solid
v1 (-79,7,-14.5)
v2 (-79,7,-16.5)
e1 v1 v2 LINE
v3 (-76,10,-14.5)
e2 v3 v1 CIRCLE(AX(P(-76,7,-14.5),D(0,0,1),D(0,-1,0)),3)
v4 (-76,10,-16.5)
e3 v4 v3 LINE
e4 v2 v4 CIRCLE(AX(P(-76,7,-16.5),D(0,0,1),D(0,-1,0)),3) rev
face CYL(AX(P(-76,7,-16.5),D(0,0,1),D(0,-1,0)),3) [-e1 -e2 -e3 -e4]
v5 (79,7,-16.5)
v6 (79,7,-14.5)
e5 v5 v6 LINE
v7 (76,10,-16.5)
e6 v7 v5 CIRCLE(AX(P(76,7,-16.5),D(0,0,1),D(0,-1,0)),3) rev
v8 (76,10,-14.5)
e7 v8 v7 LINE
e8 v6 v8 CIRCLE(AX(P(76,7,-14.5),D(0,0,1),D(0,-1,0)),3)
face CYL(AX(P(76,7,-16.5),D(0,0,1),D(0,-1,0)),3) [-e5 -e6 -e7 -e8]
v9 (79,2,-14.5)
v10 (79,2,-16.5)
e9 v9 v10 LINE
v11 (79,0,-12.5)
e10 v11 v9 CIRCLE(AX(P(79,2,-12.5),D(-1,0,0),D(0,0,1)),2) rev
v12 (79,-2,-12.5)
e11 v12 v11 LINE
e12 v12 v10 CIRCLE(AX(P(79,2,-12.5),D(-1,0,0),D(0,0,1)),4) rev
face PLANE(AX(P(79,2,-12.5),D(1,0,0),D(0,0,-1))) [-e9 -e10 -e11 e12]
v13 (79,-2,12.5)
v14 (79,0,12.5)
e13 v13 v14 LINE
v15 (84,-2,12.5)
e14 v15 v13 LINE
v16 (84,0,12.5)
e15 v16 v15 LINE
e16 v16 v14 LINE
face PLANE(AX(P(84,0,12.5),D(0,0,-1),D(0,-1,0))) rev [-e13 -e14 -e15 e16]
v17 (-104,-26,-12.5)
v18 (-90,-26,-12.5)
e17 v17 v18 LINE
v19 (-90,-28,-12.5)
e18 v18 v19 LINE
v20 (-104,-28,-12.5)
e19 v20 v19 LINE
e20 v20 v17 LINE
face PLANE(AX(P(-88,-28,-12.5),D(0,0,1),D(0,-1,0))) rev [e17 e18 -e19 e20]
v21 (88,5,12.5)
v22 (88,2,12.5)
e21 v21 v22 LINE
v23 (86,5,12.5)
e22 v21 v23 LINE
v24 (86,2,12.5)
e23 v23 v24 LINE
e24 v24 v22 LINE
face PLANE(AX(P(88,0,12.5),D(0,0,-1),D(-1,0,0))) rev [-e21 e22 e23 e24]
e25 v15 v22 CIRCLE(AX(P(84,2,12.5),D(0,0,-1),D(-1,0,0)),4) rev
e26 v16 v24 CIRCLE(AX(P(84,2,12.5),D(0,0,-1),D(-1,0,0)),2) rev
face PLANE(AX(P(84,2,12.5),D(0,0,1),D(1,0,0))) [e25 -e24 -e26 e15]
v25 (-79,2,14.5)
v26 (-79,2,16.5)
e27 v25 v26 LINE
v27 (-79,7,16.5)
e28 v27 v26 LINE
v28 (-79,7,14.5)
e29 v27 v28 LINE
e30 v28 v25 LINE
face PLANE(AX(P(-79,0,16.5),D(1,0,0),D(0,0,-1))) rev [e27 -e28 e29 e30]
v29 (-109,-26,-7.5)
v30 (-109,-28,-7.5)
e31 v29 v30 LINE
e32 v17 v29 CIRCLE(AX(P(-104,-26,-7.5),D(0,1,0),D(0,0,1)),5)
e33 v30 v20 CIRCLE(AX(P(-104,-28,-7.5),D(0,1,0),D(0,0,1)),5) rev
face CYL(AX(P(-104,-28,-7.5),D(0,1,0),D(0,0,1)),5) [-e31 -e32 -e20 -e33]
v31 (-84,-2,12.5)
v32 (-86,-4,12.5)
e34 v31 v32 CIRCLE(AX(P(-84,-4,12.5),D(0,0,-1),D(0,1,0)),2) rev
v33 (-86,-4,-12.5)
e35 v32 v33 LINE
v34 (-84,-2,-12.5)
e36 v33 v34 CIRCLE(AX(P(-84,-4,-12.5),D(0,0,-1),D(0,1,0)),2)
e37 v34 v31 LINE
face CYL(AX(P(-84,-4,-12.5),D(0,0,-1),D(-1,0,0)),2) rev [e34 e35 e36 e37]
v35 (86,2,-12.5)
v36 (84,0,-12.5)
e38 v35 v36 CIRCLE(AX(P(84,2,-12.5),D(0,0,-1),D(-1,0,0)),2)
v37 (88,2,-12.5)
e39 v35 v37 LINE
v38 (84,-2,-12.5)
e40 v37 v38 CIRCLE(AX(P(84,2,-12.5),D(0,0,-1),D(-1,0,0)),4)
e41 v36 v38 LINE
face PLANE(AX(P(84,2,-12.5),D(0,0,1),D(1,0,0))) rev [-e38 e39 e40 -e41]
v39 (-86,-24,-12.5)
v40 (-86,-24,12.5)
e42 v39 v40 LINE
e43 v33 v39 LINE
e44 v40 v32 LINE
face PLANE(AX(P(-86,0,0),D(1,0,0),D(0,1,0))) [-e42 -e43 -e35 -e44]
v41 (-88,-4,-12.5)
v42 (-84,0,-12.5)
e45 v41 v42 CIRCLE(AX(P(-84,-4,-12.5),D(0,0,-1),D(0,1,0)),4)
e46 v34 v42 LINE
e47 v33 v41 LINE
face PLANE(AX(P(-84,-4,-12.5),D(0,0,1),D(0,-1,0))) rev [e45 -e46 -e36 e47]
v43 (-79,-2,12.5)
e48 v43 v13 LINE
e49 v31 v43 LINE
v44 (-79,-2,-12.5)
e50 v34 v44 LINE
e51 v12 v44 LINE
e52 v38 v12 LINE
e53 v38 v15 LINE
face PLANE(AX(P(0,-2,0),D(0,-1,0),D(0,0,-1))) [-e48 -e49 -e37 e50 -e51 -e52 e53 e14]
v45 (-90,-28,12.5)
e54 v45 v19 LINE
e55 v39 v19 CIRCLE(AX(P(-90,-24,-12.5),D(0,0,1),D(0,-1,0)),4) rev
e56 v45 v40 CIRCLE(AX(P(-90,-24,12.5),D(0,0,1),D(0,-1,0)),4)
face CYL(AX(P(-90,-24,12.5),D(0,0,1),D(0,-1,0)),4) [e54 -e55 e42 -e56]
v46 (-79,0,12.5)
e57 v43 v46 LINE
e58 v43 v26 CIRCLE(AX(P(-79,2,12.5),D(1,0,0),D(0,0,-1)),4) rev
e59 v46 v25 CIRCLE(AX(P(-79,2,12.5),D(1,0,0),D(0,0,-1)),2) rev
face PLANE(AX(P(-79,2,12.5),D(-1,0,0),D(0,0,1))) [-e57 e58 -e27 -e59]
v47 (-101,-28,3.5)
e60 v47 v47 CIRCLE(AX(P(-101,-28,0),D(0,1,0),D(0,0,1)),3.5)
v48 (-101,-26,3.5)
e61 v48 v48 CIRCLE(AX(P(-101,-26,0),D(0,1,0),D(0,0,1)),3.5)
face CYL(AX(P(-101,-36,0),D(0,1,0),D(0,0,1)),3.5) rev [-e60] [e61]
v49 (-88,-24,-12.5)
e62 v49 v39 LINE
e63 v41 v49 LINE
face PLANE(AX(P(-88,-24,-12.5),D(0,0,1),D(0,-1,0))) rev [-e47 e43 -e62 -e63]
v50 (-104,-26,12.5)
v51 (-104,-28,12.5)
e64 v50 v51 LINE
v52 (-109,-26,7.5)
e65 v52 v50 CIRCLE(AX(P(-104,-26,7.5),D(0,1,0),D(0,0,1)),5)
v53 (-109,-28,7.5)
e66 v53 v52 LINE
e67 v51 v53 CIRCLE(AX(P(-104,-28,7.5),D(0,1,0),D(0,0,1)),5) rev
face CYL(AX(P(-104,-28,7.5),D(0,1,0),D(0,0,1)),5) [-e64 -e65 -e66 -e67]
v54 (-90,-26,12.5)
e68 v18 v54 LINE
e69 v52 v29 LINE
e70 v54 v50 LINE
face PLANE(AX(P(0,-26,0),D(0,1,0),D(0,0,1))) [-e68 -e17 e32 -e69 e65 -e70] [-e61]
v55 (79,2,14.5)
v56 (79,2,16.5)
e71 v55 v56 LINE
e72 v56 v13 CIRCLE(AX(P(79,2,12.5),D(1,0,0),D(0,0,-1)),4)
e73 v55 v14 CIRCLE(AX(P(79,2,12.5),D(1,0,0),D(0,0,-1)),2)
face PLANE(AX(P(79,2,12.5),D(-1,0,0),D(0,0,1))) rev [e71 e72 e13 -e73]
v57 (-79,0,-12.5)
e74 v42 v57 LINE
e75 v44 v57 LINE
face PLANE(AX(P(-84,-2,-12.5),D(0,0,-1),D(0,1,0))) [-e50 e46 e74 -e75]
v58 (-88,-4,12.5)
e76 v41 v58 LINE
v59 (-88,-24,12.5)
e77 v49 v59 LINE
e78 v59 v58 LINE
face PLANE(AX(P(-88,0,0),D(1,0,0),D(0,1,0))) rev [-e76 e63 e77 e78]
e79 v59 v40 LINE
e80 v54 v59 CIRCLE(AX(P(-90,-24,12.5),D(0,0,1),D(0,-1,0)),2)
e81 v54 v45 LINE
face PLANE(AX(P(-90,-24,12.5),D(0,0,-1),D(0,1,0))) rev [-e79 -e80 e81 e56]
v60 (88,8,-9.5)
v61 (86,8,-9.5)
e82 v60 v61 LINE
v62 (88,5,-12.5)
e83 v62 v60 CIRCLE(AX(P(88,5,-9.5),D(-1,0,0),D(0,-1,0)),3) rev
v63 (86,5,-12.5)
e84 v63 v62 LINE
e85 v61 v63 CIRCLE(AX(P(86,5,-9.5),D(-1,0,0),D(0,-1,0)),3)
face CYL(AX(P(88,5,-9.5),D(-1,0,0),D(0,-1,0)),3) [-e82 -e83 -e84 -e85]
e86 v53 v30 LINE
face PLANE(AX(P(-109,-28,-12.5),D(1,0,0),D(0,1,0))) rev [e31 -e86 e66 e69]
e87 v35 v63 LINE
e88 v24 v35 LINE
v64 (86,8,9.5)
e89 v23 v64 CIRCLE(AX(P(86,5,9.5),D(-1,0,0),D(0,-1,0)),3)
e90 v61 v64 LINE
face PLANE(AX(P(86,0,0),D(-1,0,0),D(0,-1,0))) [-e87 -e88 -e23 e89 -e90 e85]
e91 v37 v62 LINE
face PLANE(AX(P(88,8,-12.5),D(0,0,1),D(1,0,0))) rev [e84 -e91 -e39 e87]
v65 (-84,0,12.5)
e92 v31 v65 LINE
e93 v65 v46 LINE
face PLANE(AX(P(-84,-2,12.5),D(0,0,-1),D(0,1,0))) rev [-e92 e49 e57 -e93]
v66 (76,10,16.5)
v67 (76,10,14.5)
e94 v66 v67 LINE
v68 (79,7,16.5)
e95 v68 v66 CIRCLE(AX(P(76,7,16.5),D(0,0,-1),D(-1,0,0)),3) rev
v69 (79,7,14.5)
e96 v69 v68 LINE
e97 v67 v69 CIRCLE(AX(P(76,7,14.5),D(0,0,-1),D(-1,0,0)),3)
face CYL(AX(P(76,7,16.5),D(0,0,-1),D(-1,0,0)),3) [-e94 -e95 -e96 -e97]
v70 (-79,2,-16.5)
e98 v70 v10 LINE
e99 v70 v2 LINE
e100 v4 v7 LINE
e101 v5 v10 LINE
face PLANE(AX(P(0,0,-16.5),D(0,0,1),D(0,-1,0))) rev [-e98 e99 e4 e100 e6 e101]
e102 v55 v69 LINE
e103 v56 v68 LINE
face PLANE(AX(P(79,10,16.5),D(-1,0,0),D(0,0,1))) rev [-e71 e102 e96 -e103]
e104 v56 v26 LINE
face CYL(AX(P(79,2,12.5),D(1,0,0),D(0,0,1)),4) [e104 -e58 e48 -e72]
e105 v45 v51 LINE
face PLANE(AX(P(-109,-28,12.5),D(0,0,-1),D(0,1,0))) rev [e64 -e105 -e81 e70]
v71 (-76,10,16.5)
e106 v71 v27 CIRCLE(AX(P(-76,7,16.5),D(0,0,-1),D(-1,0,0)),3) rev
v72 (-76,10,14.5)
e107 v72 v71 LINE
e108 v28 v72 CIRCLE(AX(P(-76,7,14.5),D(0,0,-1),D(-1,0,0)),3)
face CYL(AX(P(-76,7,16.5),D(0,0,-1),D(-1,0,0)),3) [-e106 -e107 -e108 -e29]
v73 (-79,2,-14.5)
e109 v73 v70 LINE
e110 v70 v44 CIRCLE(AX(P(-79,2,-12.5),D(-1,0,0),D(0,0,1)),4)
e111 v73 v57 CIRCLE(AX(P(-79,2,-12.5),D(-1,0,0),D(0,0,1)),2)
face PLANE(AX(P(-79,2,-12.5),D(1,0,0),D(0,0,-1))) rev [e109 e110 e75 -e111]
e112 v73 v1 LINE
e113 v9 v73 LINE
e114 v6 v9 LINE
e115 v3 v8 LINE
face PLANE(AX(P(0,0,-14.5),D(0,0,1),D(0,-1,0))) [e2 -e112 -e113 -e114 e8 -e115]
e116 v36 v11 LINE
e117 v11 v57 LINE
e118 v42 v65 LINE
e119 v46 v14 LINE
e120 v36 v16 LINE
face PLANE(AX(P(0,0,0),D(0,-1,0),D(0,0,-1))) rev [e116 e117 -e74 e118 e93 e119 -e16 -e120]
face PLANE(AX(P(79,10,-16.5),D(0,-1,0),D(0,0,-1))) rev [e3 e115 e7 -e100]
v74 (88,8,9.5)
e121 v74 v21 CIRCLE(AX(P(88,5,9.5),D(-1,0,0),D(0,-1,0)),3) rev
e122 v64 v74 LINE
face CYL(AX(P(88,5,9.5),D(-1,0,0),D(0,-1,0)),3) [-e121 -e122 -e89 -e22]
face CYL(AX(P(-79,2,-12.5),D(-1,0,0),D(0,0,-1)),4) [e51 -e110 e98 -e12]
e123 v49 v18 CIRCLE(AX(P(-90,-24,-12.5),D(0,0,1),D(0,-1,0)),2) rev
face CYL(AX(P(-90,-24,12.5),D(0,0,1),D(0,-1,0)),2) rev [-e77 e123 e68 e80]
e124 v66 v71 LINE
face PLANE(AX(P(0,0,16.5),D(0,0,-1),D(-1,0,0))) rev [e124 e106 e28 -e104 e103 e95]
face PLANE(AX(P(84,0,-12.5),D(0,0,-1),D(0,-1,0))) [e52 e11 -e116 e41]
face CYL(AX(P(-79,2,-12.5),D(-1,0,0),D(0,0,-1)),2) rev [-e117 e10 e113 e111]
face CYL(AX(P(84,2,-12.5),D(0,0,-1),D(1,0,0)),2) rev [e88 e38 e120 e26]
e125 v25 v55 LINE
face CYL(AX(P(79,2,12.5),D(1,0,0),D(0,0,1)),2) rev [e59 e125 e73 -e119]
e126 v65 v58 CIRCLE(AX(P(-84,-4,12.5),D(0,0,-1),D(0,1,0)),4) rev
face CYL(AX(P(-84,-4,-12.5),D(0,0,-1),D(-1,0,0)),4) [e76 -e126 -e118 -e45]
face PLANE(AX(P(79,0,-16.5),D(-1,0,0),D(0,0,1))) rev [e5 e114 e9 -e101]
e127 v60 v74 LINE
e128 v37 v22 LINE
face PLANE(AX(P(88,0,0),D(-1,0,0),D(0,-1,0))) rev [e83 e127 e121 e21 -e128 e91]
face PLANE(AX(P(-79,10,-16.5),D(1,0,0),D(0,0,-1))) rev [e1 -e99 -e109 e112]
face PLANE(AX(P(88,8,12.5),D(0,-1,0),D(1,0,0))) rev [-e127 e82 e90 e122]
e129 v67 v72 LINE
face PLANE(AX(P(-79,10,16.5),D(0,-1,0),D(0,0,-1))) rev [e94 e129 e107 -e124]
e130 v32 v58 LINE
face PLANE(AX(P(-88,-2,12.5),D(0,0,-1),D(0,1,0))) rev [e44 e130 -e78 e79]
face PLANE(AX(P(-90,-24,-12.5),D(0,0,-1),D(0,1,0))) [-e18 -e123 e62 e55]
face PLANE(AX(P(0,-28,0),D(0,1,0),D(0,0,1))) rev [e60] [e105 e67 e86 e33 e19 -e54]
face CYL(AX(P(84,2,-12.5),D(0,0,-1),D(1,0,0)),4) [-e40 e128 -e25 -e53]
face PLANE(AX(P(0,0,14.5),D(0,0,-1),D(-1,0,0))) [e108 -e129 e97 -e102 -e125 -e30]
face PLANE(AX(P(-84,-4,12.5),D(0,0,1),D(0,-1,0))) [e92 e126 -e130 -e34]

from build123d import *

# Parameters (mm, degrees)
SKETCH_1_W                  = 158
SKETCH_1_H                  = 25
SM_BASE_FLANGE_1_DEPTH      = 2
SM_EDGE_FLANGE_1_DEPTH      = 158
SM_EDGE_FLANGE_1_BEND_DEPTH = 158
SM_EDGE_FLANGE_2_DEPTH      = 25
SM_EDGE_FLANGE_3_DEPTH      = 25
SM_EDGE_FLANGE_4_DEPTH      = 25
FILLET_1_R                  = 3
SKETCH_21_R                 = 3.5
CUT_EXTRUDE_1_DEPTH         = 10
FILLET_2_R                  = 5


# Sheet-metal steps are written as plain solids
with BuildPart() as part:
    # Sketch 1 → Базовая кромка1 (new body)
    with BuildSketch(Plane(origin=(0, 0, 0), x_dir=(1, 0, 0), z_dir=(0, 1, 0))):
        Rectangle(SKETCH_1_W, SKETCH_1_H)
    extrude(amount=-SM_BASE_FLANGE_1_DEPTH)

    # Ребро-кромка1 section (across the edge) → Ребро-кромка1 (add)
    with BuildSketch(Plane(origin=(79, 0, -14.5), x_dir=(0, 0, 1), z_dir=(-1, 0, 0))):
        with BuildLine():
            Line((-2, 2), (-2, 10))
            Line((-2, 10), (0, 10))
            Line((0, 10), (0, 2))
            ThreePointArc((0, 2), (0.585786438, 0.585786438), (2, 0))
            Line((2, 0), (2, -2))
            ThreePointArc((2, -2), (-0.828427125, -0.828427125), (-2, 2))
        make_face()
    extrude(amount=SM_EDGE_FLANGE_1_DEPTH)

    # Ребро-кромка1 section 2 (across the edge) → Ребро-кромка1 bend (add)
    with BuildSketch(Plane(origin=(-79, 0, 14.5), x_dir=(0, 0, -1), z_dir=(1, 0, 0))):
        with BuildLine():
            Line((-2, 2), (-2, 10))
            Line((-2, 10), (0, 10))
            Line((0, 10), (0, 2))
            ThreePointArc((0, 2), (0.585786438, 0.585786438), (2, 0))
            Line((2, 0), (2, -2))
            ThreePointArc((2, -2), (-0.828427125, -0.828427125), (-2, 2))
        make_face()
    extrude(amount=SM_EDGE_FLANGE_1_BEND_DEPTH)

    # Ребро-кромка2 section (across the edge) → Ребро-кромка2 (add)
    with BuildSketch(Plane(origin=(86, 0, 12.5), x_dir=(-1, 0, 0), z_dir=(0, 0, -1))):
        with BuildLine():
            Line((-2, 2), (-2, 8))
            Line((-2, 8), (0, 8))
            Line((0, 8), (0, 2))
            ThreePointArc((0, 2), (0.585786438, 0.585786438), (2, 0))
            Line((2, 0), (7, 0))
            Line((7, 0), (7, -2))
            Line((7, -2), (2, -2))
            ThreePointArc((2, -2), (-0.828427125, -0.828427125), (-2, 2))
        make_face()
    extrude(amount=SM_EDGE_FLANGE_2_DEPTH)

    # Ребро-кромка3 section (across the edge) → Ребро-кромка3 (add)
    with BuildSketch(Plane(origin=(-86, -2, 12.5), x_dir=(1, 0, 0), z_dir=(0, 0, -1))):
        with BuildLine():
            Line((-2, 2), (-2, 22))
            Line((-2, 22), (0, 22))
            Line((0, 22), (0, 2))
            ThreePointArc((0, 2), (0.585786438, 0.585786438), (2, 0))
            Line((2, 0), (7, 0))
            Line((7, 0), (7, -2))
            Line((7, -2), (2, -2))
            ThreePointArc((2, -2), (-0.828427125, -0.828427125), (-2, 2))
        make_face()
    extrude(amount=SM_EDGE_FLANGE_3_DEPTH)

    # Ребро-кромка4 section (across the edge) → Ребро-кромка4 (add)
    with BuildSketch(Plane(origin=(-88, -26, -12.5), x_dir=(0, 1, 0), z_dir=(0, 0, 1))):
        with BuildLine():
            Line((-2, 2), (-2, 21))
            Line((-2, 21), (0, 21))
            Line((0, 21), (0, 2))
            ThreePointArc((0, 2), (0.585786438, 0.585786438), (2, 0))
            Line((2, 0), (2, -2))
            ThreePointArc((2, -2), (-0.828427125, -0.828427125), (-2, 2))
        make_face()
    extrude(amount=SM_EDGE_FLANGE_4_DEPTH)

    # Скругление1
    fillet_1_edges = [part.edges().sort_by_distance(p)[0] for p in [
        (79, 10, -15.5),
        (-79, 10, -15.5),
        (-79, 10, 15.5),
        (79, 10, 15.5),
        (87, 8, 12.5),
        (87, 8, -12.5),
    ]]
    fillet(fillet_1_edges, radius=FILLET_1_R)

    # Эскиз21 → Вырез-Вытянуть1 (cut)
    with BuildSketch(Plane(origin=(0, -26, 0), x_dir=(1, 0, 0), z_dir=(0, 1, 0))):
        with Locations(Location((-101, 0, 0), (0, 0, 270))):
            Circle(SKETCH_21_R)
    extrude(amount=-CUT_EXTRUDE_1_DEPTH, mode=Mode.SUBTRACT)

    # Скругление2
    fillet_2_edges = [part.edges().sort_by_distance(p)[0] for p in [
        (-109, -27, -12.5),
        (-109, -27, 12.5),
    ]]
    fillet(fillet_2_edges, radius=FILLET_2_R)


solid = part.part
